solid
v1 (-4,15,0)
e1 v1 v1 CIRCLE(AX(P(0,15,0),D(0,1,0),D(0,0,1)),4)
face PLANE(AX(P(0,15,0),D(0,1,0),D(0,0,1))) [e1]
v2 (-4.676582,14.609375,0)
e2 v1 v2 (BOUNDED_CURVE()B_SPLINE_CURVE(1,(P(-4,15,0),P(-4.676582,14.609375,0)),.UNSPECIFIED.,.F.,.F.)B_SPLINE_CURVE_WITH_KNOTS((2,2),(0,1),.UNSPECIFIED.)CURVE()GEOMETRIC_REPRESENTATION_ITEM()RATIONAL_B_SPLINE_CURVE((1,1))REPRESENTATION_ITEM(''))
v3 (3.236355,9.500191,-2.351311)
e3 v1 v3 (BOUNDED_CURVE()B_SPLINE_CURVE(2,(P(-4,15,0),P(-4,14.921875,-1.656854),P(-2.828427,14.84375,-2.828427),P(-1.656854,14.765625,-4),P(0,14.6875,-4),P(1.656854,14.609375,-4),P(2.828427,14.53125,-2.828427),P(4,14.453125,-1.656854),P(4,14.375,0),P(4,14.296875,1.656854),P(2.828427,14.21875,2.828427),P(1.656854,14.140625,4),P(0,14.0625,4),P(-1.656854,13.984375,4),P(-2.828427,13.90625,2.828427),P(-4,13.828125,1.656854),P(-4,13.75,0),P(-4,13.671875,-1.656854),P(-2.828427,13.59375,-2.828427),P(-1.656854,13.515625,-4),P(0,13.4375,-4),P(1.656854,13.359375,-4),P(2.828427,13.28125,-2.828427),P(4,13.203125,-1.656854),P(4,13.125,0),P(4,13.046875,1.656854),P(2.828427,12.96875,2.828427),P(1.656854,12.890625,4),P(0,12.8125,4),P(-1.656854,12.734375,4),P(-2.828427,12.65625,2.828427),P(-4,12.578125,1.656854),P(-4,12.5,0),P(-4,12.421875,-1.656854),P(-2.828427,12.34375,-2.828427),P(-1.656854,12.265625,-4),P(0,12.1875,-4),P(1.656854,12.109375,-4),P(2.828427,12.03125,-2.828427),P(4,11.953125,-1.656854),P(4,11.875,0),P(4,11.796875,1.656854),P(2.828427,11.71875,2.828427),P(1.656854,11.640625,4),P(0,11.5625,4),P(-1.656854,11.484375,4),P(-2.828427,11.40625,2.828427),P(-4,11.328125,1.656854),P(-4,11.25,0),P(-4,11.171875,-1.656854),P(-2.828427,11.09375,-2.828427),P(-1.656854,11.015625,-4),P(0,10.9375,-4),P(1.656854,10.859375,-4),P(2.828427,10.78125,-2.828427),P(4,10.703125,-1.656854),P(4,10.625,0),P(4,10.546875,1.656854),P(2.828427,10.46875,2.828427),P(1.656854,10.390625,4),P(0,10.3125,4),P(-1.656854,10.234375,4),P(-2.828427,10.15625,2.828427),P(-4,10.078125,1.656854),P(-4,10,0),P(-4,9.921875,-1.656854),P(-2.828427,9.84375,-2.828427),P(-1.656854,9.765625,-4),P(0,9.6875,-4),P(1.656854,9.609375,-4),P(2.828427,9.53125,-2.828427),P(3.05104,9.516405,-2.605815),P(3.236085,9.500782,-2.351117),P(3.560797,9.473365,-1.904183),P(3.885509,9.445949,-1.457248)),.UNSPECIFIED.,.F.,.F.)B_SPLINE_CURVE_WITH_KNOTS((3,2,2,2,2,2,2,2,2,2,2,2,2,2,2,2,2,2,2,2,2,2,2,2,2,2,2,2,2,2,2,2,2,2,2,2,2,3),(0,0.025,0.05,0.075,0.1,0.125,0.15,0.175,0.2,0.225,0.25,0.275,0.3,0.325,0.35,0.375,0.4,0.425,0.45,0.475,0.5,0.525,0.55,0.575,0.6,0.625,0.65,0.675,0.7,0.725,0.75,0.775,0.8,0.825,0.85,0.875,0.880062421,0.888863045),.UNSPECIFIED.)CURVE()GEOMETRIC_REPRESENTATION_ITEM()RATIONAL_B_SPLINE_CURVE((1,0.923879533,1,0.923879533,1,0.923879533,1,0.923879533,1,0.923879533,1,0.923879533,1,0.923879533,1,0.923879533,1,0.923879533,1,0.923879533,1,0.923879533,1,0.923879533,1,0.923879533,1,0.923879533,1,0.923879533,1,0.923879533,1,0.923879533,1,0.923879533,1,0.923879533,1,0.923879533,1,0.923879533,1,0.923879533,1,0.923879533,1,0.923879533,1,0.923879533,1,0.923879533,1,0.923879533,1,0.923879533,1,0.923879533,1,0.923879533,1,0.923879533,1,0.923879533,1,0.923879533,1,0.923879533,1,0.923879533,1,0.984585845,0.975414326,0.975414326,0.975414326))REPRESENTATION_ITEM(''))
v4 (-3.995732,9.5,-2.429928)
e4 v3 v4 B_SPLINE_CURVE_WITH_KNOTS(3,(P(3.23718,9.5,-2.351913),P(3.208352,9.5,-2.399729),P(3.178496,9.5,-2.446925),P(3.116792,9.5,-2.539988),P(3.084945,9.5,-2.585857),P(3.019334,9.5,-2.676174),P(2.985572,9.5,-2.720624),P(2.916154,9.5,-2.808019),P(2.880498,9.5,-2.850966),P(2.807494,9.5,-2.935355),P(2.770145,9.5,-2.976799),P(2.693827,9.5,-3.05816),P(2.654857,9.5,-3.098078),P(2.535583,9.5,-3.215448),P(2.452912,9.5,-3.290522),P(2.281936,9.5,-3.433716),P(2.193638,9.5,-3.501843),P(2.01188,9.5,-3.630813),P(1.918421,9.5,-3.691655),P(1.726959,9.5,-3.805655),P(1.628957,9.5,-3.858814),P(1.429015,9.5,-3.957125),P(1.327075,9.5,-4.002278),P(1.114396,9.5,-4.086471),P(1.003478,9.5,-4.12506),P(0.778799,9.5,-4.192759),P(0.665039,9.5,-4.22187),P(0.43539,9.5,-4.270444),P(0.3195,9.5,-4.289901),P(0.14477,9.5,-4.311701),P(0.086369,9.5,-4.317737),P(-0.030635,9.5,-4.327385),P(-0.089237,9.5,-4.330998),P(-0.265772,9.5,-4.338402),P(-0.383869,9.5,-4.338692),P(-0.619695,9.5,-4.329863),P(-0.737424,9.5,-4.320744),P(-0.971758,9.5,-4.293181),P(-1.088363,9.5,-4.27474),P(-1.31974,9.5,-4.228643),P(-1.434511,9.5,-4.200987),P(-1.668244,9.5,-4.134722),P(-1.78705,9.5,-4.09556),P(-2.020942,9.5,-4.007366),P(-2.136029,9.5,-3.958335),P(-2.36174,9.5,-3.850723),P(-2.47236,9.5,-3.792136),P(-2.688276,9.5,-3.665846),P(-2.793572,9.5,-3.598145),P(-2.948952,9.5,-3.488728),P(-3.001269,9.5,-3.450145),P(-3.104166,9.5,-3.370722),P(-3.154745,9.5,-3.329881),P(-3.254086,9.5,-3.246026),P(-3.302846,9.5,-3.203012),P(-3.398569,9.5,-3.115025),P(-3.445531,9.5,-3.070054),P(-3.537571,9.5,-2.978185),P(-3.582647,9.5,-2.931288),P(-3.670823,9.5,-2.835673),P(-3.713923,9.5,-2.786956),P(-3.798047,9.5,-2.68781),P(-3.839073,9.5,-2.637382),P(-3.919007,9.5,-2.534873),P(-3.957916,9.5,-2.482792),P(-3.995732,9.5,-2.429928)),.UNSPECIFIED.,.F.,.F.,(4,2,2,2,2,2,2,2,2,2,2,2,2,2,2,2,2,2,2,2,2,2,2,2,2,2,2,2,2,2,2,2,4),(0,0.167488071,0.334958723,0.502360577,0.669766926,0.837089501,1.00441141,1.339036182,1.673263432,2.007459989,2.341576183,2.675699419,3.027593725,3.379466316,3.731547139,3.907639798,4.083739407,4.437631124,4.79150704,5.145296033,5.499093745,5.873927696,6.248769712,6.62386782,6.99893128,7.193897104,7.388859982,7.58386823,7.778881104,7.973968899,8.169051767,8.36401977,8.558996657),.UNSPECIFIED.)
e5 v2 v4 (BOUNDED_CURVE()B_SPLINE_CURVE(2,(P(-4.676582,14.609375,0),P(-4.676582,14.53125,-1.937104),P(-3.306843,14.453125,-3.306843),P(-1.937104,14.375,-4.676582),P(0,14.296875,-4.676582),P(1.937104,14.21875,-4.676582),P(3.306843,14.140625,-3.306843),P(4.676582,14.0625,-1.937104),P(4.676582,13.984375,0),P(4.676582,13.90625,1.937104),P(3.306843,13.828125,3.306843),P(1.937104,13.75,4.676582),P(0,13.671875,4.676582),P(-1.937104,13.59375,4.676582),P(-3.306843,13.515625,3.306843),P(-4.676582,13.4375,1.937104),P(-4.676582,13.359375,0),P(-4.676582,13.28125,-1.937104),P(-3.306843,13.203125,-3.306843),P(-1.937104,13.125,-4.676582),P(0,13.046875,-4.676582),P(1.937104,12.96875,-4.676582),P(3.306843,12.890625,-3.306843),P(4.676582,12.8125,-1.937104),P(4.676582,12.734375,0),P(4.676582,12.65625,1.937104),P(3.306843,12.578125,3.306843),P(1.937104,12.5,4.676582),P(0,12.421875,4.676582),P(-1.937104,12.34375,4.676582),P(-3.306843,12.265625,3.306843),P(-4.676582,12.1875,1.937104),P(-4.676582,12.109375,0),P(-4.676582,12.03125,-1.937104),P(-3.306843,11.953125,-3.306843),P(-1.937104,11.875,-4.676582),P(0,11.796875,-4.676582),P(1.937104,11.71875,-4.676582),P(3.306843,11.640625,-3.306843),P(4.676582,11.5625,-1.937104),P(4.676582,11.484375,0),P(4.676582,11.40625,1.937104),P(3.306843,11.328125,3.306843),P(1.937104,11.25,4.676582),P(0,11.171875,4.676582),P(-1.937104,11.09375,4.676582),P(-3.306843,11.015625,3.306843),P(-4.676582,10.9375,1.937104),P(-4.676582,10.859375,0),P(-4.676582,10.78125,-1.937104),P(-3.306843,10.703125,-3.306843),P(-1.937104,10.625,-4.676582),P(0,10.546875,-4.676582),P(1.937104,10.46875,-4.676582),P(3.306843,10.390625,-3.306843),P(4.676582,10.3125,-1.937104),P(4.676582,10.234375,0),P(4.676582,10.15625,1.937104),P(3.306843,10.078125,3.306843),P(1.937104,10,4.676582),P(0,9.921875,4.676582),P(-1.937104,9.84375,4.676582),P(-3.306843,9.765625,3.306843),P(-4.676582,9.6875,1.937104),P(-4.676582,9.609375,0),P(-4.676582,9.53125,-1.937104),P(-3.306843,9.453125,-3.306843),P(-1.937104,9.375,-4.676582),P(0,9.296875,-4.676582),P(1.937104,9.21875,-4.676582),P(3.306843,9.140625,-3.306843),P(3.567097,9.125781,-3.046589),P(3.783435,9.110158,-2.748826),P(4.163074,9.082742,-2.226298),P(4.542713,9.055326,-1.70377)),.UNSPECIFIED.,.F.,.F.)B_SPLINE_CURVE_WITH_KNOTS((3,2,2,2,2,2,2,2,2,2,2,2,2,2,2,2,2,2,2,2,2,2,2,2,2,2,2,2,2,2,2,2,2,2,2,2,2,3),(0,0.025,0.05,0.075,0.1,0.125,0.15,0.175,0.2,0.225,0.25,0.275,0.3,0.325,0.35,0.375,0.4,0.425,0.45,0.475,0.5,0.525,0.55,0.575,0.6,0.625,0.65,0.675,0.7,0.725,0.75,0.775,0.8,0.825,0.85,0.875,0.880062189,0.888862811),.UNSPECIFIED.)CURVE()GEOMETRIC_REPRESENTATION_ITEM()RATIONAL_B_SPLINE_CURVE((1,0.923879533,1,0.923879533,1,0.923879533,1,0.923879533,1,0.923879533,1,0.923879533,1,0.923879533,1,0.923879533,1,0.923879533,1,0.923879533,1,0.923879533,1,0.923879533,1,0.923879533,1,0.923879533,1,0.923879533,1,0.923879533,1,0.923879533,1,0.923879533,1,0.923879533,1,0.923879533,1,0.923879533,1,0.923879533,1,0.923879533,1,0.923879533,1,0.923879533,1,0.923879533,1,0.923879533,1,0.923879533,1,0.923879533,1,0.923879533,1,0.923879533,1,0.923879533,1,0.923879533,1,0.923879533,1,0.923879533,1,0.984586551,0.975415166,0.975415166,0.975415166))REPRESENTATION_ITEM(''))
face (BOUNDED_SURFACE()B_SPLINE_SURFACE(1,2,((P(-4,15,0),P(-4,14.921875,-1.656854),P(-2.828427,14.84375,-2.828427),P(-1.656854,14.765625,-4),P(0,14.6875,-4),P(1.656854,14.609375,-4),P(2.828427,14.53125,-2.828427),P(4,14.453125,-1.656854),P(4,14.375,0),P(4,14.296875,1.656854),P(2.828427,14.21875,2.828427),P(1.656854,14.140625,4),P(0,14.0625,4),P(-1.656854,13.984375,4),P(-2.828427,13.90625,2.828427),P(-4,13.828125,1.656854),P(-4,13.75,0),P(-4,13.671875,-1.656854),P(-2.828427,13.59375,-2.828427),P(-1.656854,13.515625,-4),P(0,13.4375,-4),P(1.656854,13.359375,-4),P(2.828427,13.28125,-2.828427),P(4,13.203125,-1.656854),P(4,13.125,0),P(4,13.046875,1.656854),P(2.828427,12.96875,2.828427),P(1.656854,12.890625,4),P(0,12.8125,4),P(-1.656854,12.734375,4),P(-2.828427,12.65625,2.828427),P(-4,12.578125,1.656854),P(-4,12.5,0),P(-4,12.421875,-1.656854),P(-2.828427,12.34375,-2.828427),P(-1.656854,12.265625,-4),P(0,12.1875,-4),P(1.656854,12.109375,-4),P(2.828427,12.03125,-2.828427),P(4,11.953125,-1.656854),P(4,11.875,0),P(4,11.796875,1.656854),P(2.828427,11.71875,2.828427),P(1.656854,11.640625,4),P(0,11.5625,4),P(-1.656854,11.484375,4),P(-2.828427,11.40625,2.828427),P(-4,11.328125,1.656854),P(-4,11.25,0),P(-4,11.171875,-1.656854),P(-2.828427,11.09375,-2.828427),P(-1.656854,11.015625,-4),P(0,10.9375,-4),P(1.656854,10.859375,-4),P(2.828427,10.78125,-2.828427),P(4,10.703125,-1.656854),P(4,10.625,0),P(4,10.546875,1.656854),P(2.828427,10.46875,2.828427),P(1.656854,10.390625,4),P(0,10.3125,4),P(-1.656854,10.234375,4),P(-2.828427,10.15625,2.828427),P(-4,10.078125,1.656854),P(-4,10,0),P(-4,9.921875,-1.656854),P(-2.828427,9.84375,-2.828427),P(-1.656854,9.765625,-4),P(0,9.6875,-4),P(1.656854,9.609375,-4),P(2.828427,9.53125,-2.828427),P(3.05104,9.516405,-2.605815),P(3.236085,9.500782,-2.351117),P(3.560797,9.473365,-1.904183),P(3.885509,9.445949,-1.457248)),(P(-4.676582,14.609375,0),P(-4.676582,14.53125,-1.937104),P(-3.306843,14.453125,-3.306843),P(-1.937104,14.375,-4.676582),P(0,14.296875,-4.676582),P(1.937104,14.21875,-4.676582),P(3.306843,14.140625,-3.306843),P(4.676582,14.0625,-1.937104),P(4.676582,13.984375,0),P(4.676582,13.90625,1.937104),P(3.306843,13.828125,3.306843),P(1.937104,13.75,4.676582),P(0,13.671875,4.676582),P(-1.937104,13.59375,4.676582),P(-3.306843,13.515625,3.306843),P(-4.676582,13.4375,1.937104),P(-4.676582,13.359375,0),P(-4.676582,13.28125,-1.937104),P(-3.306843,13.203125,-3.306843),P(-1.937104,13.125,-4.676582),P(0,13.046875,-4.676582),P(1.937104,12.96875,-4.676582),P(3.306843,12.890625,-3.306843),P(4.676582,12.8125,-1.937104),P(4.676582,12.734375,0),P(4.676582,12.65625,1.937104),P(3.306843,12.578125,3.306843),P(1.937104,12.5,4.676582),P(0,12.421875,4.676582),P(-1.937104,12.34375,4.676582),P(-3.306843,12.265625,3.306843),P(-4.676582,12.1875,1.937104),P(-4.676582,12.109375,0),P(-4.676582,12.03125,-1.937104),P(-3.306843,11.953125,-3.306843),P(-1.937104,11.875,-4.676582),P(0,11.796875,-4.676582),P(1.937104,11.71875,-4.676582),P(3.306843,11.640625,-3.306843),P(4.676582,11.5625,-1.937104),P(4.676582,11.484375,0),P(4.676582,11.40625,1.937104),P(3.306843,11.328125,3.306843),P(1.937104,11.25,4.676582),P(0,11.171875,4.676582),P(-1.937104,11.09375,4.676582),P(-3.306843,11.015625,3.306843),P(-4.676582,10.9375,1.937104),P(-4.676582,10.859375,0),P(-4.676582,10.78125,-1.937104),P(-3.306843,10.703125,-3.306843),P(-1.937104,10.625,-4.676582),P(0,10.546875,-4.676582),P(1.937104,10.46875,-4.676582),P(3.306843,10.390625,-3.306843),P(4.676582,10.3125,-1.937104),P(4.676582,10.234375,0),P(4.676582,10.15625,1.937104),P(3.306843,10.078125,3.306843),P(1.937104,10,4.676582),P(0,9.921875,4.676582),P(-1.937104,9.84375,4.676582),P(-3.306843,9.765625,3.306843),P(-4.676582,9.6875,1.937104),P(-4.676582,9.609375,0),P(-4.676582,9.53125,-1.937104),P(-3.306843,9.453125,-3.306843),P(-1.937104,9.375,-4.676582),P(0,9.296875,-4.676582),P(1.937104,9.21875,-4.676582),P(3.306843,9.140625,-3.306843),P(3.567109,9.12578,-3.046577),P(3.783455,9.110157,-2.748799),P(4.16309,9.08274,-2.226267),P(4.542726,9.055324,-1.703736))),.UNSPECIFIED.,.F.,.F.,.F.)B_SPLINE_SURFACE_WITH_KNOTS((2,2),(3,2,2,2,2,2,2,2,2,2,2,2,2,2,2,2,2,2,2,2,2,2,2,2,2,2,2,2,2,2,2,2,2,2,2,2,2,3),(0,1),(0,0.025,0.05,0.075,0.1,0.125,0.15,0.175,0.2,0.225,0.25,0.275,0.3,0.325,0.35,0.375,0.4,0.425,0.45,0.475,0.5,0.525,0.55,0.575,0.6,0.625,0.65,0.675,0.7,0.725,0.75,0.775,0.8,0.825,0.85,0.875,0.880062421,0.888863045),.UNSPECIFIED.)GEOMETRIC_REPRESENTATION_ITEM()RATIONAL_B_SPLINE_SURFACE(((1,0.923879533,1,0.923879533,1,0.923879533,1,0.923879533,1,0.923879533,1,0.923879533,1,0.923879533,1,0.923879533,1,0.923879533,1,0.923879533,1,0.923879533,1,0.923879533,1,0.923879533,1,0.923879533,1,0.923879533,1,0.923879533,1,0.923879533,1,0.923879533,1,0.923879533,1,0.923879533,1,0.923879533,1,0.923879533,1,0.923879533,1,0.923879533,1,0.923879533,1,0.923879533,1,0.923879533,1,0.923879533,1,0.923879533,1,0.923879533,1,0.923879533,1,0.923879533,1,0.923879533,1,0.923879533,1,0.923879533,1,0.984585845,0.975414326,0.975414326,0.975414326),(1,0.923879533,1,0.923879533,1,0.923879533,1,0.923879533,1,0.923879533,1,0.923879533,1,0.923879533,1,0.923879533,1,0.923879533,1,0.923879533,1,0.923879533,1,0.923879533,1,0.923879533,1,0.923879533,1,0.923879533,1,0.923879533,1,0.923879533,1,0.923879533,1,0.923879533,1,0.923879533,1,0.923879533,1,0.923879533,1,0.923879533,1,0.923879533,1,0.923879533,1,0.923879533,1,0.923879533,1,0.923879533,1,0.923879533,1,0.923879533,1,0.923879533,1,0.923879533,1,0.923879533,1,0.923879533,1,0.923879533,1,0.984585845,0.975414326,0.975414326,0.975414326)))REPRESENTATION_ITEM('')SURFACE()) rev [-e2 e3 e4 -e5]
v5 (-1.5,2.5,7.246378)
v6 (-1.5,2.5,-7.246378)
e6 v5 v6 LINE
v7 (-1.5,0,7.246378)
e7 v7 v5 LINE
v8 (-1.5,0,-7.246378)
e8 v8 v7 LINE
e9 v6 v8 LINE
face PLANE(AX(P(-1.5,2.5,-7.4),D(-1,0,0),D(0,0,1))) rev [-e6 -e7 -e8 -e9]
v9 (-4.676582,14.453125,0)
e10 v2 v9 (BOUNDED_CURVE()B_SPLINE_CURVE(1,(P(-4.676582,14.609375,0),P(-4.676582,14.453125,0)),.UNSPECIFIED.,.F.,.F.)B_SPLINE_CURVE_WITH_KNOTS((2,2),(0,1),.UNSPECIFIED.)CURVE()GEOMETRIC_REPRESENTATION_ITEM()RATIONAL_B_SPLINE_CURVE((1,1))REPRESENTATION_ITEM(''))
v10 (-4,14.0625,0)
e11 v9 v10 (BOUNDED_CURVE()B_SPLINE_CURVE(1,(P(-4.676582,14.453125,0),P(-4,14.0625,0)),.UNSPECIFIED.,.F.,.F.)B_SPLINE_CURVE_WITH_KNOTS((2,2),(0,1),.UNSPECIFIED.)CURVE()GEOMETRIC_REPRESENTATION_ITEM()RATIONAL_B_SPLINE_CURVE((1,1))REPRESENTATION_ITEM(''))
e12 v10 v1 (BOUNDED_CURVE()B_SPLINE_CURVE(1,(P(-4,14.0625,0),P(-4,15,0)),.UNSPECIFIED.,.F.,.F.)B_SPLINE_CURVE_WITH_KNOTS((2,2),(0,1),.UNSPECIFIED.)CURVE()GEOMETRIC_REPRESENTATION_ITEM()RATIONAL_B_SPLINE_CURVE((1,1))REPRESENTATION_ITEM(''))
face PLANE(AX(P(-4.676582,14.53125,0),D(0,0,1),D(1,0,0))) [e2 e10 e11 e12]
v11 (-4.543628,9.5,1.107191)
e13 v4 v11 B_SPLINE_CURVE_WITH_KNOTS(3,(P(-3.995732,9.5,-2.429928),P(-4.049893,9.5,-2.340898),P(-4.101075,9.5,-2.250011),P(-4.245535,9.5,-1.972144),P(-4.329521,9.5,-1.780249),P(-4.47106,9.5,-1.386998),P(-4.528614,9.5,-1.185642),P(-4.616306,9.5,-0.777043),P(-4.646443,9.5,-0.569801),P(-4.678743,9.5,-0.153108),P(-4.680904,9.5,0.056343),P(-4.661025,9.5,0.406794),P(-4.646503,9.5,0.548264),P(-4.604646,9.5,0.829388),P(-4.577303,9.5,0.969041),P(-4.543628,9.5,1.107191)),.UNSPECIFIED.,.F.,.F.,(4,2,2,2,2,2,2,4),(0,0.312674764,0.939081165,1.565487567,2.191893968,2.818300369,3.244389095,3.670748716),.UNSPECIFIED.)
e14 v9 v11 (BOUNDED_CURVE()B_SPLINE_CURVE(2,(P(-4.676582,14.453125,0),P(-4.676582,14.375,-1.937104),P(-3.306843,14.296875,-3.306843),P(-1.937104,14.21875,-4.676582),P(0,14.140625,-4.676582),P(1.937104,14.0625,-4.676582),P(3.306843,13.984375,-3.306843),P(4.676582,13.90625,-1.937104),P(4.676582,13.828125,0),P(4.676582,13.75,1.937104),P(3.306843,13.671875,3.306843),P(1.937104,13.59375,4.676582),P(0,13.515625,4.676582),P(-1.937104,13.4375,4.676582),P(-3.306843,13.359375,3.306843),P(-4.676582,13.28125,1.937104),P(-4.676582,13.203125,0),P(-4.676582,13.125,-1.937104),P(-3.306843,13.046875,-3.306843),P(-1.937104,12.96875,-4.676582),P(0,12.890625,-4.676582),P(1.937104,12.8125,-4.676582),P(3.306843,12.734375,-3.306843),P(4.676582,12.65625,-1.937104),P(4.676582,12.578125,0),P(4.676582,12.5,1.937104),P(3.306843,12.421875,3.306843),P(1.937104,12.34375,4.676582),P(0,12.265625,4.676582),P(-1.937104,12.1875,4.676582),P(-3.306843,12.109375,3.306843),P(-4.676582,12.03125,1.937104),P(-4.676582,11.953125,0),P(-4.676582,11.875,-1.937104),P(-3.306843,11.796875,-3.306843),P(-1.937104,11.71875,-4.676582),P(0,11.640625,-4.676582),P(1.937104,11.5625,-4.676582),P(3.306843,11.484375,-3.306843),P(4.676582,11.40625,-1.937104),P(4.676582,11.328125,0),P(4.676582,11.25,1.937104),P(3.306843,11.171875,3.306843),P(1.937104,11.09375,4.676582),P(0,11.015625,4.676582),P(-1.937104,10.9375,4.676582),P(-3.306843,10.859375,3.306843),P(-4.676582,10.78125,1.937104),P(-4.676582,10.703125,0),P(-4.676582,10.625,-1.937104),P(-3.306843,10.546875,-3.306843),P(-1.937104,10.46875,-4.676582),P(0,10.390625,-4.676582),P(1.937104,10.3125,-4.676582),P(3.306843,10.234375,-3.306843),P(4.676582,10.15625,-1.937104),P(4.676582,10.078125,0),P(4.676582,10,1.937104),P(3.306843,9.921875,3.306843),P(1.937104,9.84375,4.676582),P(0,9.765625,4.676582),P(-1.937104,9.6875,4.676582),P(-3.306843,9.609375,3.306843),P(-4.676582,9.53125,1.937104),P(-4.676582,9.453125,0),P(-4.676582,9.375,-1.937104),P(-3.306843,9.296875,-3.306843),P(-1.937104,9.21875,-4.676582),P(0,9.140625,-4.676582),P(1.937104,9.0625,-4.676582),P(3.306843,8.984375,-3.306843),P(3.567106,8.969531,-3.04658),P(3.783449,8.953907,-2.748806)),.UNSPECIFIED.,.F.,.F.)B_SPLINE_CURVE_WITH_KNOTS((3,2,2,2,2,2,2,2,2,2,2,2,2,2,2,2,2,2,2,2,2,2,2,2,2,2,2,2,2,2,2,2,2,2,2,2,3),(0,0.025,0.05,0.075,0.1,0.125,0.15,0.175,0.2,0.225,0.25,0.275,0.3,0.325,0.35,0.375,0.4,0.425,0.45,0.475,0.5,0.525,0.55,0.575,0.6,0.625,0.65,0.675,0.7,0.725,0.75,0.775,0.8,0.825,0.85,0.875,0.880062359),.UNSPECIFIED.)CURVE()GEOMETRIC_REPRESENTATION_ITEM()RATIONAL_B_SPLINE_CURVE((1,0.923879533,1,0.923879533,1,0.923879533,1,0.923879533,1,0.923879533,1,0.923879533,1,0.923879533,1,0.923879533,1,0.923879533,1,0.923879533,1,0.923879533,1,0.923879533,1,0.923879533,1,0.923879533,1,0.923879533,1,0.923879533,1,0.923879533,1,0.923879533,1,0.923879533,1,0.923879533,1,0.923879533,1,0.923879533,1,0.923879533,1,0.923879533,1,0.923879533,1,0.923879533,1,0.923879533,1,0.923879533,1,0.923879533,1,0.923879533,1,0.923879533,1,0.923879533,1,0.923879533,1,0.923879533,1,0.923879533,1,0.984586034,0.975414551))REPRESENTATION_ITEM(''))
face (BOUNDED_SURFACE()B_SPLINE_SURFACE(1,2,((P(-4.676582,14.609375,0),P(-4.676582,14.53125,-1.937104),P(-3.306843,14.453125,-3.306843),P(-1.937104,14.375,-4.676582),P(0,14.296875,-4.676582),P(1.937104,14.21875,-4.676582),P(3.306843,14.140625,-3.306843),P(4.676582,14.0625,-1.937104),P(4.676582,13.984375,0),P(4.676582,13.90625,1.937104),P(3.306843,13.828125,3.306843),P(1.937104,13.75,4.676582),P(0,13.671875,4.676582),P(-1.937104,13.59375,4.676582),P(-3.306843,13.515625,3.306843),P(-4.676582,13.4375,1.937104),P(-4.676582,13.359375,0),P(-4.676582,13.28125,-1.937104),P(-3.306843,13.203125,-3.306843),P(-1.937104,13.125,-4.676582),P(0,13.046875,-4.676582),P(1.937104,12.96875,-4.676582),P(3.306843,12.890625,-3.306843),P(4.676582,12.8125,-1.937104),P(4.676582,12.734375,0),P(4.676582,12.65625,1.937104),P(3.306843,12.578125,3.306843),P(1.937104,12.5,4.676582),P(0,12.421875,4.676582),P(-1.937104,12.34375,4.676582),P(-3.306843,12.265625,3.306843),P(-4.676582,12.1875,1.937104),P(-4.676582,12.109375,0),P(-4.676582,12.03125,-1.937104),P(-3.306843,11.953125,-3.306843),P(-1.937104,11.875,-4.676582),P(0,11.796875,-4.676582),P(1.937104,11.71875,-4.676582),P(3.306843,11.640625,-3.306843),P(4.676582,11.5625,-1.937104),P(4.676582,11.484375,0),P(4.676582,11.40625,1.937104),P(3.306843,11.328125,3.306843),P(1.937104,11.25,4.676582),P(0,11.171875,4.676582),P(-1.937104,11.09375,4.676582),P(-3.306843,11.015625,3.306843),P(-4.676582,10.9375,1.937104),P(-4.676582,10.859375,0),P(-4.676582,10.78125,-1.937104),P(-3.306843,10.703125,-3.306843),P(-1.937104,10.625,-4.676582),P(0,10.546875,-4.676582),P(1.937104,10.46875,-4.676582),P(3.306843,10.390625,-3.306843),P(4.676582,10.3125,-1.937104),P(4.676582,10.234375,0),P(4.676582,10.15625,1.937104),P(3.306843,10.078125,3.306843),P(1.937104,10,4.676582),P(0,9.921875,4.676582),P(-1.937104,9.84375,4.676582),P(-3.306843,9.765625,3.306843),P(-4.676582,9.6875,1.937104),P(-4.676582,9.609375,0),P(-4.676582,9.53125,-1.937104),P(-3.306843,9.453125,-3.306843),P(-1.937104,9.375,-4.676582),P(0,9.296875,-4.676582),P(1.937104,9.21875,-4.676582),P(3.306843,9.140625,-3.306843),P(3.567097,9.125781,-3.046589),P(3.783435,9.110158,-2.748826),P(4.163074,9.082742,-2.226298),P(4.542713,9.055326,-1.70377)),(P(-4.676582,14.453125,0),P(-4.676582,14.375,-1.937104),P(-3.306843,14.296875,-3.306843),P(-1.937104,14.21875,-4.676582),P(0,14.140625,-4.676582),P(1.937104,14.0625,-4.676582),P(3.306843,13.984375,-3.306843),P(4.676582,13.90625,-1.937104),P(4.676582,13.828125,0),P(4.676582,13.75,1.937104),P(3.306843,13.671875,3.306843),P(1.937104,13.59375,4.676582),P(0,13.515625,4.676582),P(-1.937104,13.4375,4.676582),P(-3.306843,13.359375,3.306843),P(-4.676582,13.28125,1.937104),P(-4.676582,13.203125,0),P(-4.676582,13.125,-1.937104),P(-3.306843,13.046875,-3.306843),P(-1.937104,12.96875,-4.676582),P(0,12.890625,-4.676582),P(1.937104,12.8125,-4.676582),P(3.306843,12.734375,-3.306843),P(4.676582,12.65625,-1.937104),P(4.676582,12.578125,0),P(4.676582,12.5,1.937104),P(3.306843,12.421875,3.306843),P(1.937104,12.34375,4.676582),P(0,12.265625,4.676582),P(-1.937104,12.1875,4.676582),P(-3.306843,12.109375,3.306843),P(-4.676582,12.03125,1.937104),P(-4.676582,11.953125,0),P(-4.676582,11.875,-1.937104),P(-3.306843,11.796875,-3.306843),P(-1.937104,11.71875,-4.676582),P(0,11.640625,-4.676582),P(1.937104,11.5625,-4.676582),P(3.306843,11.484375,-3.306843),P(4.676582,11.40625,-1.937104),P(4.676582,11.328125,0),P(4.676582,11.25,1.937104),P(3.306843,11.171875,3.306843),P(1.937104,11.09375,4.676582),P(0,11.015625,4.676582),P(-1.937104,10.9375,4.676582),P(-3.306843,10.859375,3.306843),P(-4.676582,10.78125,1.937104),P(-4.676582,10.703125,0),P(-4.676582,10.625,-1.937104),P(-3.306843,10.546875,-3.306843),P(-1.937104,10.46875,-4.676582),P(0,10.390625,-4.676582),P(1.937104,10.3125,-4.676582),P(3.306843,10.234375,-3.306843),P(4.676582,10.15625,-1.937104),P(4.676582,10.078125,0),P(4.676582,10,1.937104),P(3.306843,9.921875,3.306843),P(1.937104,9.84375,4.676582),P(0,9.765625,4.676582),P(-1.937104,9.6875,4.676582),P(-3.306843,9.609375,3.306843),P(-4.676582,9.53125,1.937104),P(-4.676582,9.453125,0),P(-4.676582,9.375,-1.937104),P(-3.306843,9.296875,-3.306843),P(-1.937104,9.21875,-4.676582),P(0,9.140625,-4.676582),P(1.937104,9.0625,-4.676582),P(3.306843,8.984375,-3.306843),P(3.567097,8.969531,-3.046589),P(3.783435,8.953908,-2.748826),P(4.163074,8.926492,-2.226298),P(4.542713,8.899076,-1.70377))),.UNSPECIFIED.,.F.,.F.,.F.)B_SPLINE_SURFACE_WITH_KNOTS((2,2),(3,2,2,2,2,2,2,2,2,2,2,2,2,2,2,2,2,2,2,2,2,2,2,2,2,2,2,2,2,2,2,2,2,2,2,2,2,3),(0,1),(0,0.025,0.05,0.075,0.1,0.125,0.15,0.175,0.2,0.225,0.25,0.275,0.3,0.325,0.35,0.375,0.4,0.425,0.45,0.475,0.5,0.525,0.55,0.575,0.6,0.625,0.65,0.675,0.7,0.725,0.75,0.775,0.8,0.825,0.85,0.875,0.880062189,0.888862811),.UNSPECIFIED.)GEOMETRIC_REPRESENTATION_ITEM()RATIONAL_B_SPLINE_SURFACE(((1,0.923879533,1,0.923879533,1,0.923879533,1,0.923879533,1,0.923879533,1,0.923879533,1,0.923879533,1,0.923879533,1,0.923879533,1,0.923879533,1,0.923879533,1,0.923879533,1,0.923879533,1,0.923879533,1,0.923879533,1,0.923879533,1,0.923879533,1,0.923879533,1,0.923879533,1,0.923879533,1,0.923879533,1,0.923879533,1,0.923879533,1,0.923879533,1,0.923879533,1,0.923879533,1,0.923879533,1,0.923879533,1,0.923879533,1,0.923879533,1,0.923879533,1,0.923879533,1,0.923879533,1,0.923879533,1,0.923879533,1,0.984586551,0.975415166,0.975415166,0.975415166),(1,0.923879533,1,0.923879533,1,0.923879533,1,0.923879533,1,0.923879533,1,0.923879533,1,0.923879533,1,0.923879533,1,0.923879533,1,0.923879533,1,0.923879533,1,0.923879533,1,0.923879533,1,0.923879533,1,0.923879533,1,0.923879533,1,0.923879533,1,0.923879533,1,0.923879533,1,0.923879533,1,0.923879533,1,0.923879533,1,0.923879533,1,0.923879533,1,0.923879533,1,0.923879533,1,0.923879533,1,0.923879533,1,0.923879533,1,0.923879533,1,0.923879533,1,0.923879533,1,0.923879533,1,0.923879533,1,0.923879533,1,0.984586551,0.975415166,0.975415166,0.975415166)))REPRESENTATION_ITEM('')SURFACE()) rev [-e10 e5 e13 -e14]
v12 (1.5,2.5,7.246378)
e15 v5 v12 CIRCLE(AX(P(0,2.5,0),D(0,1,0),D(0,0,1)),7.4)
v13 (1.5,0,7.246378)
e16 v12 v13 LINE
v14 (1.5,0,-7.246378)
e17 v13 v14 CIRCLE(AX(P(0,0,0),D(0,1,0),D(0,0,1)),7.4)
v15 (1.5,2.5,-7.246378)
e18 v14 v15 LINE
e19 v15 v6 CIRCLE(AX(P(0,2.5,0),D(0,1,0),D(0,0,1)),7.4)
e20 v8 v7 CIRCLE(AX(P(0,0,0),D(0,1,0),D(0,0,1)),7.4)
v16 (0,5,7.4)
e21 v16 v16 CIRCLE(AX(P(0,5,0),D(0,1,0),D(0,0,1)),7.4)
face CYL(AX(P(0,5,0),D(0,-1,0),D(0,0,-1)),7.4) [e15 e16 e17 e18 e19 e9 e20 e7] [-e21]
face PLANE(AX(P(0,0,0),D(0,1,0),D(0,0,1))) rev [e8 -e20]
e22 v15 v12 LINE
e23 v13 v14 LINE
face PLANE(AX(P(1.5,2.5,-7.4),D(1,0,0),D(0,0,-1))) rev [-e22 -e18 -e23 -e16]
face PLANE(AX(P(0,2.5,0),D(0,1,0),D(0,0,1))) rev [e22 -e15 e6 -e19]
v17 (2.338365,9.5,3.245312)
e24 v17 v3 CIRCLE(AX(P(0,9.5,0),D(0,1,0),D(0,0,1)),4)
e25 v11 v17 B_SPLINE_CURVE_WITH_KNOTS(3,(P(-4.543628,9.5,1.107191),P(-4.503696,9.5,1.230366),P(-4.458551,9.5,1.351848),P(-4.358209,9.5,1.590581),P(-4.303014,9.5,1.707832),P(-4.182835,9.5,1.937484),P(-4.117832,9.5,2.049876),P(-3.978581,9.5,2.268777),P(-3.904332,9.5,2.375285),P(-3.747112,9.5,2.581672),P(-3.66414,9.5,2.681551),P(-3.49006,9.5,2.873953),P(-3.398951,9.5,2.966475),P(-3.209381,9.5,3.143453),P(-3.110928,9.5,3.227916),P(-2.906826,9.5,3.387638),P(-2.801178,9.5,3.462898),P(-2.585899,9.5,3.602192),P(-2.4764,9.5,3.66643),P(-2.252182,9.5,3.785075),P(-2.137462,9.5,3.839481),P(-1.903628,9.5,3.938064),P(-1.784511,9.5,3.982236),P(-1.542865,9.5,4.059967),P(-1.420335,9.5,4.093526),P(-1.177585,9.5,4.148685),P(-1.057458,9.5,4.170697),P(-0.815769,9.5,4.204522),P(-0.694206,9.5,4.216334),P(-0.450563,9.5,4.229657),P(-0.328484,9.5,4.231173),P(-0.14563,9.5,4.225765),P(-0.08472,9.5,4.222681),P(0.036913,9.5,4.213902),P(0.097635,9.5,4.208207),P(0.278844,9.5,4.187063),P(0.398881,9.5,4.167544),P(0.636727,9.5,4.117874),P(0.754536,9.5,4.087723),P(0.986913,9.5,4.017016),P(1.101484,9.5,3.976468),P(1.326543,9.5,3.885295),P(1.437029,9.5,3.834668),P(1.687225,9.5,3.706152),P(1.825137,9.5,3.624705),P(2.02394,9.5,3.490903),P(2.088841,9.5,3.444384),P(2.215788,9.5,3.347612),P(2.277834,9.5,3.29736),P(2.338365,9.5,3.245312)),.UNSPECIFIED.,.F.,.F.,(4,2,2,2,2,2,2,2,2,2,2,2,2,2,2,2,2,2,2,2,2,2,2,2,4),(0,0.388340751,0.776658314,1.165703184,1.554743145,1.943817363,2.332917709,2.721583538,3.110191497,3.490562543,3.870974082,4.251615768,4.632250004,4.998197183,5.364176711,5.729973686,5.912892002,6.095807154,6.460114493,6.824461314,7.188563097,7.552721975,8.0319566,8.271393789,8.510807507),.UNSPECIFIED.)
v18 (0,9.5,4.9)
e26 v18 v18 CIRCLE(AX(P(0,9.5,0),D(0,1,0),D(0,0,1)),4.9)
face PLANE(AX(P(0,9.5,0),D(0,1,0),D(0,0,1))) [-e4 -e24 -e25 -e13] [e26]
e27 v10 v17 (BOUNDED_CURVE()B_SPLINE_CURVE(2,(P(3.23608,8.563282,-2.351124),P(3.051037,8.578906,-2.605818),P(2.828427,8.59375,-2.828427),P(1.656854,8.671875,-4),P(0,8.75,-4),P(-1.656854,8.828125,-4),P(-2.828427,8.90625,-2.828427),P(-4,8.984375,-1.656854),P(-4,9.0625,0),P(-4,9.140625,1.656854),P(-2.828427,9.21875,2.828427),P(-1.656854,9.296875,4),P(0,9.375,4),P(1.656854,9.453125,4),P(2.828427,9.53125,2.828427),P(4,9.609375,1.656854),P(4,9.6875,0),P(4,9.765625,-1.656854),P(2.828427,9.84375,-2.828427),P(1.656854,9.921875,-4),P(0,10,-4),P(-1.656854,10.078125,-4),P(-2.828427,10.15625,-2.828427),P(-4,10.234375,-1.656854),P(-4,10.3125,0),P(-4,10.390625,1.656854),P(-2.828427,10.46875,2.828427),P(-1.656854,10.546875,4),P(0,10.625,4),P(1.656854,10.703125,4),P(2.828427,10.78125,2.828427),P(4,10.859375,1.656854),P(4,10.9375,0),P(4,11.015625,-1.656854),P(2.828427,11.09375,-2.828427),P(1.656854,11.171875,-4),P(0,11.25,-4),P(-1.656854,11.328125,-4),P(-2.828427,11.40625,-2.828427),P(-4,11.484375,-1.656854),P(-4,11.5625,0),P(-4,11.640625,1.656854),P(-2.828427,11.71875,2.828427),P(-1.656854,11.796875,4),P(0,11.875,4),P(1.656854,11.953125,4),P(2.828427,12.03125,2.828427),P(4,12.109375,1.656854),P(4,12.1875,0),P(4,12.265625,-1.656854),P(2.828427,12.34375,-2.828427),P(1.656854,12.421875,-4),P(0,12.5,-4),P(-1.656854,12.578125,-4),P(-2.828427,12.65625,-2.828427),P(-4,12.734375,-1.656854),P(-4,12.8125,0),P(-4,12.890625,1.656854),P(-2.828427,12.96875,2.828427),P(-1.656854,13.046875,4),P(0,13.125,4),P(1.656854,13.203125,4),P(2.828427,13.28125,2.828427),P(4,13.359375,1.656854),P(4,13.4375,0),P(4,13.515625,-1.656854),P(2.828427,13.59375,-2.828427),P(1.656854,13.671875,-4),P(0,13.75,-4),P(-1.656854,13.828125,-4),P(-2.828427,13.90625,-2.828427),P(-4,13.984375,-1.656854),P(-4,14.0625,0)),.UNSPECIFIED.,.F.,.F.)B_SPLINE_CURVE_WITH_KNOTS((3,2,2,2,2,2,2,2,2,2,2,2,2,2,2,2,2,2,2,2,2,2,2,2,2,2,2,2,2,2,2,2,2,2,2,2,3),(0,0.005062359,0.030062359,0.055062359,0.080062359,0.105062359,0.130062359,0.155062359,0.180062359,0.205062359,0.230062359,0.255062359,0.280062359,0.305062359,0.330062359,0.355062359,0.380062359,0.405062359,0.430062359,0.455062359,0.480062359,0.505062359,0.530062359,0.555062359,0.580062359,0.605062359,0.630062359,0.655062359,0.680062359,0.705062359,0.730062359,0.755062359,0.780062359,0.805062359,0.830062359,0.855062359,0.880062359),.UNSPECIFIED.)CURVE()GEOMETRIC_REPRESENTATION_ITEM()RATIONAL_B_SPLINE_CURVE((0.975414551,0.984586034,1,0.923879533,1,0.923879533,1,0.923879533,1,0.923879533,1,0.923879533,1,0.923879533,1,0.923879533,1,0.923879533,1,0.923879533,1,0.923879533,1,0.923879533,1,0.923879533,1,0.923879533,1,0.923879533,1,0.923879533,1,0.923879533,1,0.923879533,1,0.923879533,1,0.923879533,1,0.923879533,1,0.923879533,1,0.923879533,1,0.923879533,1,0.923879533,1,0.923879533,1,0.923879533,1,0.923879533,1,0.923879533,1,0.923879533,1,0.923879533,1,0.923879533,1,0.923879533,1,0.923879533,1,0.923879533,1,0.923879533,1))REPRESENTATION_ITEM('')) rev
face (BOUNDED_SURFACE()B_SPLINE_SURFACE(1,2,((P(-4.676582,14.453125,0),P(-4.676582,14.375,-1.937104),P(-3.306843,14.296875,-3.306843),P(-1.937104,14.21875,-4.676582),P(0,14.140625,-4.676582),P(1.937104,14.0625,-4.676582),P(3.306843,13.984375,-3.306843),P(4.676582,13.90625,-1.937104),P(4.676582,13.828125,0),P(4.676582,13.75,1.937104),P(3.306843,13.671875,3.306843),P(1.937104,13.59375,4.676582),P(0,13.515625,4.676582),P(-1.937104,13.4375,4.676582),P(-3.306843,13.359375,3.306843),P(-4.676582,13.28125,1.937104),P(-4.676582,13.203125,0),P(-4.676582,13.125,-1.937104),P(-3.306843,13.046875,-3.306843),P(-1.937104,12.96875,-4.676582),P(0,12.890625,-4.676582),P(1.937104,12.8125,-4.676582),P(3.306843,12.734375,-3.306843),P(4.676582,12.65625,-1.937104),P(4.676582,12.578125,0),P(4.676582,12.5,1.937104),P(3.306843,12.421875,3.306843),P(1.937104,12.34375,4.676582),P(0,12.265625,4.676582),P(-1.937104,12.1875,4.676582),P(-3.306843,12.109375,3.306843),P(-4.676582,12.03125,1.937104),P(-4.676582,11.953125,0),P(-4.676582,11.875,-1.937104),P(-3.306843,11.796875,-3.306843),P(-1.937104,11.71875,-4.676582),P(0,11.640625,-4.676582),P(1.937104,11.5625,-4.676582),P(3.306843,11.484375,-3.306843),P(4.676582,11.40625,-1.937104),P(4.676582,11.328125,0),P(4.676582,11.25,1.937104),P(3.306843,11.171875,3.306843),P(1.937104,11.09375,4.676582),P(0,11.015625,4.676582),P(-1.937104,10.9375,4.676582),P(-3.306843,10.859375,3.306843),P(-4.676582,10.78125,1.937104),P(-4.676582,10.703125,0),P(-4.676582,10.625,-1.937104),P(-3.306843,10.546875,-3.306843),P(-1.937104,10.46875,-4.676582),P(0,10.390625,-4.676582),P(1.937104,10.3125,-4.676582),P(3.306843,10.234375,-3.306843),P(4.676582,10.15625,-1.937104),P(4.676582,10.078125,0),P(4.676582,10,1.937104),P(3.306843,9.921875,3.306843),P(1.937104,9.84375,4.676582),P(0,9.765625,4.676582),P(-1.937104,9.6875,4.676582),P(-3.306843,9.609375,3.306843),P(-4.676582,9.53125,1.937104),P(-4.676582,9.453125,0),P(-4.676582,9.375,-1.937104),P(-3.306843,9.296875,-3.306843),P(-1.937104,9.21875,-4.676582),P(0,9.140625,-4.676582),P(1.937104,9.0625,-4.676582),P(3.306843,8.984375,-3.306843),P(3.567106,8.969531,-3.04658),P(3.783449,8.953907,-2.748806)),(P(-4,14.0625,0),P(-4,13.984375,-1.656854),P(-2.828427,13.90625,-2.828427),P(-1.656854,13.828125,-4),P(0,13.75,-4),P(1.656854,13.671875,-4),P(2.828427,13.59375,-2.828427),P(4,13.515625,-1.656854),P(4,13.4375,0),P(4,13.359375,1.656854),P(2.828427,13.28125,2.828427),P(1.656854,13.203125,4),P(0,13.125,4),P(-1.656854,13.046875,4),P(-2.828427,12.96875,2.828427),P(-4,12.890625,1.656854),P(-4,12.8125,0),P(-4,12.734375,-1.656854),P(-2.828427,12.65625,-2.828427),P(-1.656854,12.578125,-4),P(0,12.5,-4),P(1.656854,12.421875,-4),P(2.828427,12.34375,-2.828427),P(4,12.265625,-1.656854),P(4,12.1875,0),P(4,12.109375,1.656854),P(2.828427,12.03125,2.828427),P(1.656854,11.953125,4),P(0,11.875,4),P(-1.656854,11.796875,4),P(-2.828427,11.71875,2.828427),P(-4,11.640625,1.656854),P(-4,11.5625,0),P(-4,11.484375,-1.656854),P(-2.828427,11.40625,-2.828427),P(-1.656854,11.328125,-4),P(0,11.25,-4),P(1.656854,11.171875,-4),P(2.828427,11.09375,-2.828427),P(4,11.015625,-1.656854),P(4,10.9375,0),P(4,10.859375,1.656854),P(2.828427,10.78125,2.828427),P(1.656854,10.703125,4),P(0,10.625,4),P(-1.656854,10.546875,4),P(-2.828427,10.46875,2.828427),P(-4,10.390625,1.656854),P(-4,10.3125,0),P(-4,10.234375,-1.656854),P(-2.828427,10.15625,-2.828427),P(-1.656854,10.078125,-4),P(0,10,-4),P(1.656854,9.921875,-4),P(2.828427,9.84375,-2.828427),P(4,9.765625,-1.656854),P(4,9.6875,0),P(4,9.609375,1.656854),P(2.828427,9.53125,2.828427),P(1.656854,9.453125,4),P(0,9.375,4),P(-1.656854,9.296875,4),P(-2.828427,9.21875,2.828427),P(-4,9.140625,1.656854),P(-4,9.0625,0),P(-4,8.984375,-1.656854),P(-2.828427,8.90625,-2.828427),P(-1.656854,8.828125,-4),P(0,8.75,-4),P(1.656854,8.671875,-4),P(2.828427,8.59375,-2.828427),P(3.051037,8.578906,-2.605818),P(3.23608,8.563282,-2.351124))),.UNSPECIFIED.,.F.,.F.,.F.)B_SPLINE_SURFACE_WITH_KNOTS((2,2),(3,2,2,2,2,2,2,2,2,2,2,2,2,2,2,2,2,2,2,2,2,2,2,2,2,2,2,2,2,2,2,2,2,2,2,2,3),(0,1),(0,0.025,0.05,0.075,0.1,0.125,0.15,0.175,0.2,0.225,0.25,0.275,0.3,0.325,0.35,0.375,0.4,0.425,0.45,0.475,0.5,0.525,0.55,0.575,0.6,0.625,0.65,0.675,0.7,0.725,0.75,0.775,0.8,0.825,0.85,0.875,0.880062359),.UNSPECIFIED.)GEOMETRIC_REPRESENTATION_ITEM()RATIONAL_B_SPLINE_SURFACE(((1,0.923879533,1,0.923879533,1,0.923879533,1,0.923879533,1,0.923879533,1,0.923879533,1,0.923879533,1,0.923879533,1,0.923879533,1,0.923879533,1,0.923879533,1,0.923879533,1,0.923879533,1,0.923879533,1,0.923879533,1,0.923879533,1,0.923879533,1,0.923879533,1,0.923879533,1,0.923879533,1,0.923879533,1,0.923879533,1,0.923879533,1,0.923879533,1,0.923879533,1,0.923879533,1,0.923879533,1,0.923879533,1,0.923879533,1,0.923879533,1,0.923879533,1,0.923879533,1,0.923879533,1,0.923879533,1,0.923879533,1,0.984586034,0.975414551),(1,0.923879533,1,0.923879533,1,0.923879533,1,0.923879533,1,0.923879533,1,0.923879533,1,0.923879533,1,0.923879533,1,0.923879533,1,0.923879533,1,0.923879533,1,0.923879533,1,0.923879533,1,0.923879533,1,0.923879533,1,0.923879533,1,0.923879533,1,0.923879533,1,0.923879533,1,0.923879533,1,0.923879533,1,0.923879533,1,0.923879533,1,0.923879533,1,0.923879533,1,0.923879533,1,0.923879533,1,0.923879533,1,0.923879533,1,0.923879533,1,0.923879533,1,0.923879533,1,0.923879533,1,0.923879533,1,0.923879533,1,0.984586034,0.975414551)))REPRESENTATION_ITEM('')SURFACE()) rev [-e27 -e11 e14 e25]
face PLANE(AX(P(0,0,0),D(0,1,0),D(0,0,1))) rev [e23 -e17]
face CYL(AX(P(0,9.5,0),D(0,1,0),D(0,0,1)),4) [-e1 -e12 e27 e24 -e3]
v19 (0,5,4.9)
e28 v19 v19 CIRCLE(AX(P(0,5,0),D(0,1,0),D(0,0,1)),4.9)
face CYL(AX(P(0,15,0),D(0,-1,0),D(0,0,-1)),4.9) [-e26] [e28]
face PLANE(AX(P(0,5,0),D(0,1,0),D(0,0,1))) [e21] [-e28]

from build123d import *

# Parameters (mm, degrees)
SKETCH1_R           = 7.4
BOSS_EXTRUDE1_DEPTH = 5
SKETCH2_R           = 4.9
BOSS_EXTRUDE2_DEPTH = 10
SKETCH13_OUTSIDE_W  = 21.95
SKETCH13_OUTSIDE_H  = 21.95
SKETCH13_OUTSIDE_R  = 4
CUT_EXTRUDE4_DEPTH  = 5.5
THREAD2_PITCH       = 1.25
SKETCH5_W           = 3
SKETCH5_H           = 14.8
CUT_EXTRUDE5_DEPTH  = 2.5


with BuildPart() as part:
    # Sketch1 → Boss-Extrude1 (new body)
    with BuildSketch(Plane(origin=(0, 0, 0), x_dir=(1, 0, 0), z_dir=(0, 1, 0))):
        with Locations(Location((0, 0, 0), (0, 0, 270))):
            Circle(SKETCH1_R)
    extrude(amount=BOSS_EXTRUDE1_DEPTH)

    # Sketch2 → Boss-Extrude2 (add)
    with BuildSketch(Plane(origin=(0, 5, 0), x_dir=(1, 0, 0), z_dir=(0, 1, 0))):
        with Locations(Location((0, 0, 0), (0, 0, 270))):
            Circle(SKETCH2_R)
    extrude(amount=BOSS_EXTRUDE2_DEPTH)

    # Sketch13 outside → Cut-Extrude4 (cut)
    with BuildSketch(Plane(origin=(0, 15, 0), x_dir=(1, 0, 0), z_dir=(0, 1, 0))):
        Rectangle(SKETCH13_OUTSIDE_W, SKETCH13_OUTSIDE_H)
        with Locations(Location((0, 0, 0), (0, 0, 270))):
            Circle(SKETCH13_OUTSIDE_R, mode=Mode.SUBTRACT)
    extrude(amount=-CUT_EXTRUDE4_DEPTH, mode=Mode.SUBTRACT)

    # Thread2: the profile of Thread Profile4 profile screwed along a right-hand helix of 4.4 turns, 8 arcs to a turn; built about Z, then put on its axis
    thread2_z = Axis((0, 0, 0), (0, 0, 1))
    thread2_corners = [(3.9997, 0, -0.000173205), (4.676582344, 0, 0.390624998), (4.676582344, 0, 0.546874998), (3.9997, 0, 0.937673202)]
    with BuildLine(mode=Mode.PRIVATE) as thread2_profile:
        Line(thread2_corners[0], thread2_corners[1])
        Line(thread2_corners[1], thread2_corners[2])
        Line(thread2_corners[2], thread2_corners[3])
        Line(thread2_corners[3], thread2_corners[0])
    thread2_cap = Face(thread2_profile.wire())
    thread2_turn_angles = [0, 22.5, 45, 67.5, 90, 112.5, 135, 157.5, 180, 202.5, 225, 247.5, 270, 292.5, 315, 337.5, 360]
    thread2_turn_weights = [1, 0.9238795325112867, 1, 0.9238795325112867, 1, 0.9238795325112867, 1, 0.9238795325112867, 1, 0.9238795325112867, 1, 0.9238795325112867, 1, 0.9238795325112867, 1, 0.9238795325112867, 1]
    thread2_turn_rails = [Edge.make_bspline([Vector(p[0], p[1], 0).rotate(thread2_z, thread2_turn_angles[k]) / thread2_turn_weights[k] + Vector(0, 0, p[2] + THREAD2_PITCH * thread2_turn_angles[k] / 360) for k in range(17)], [0, 0, 0, 1, 1, 2, 2, 3, 3, 4, 4, 5, 5, 6, 6, 7, 7, 8, 8, 8], 2, thread2_turn_weights) for p in thread2_corners]
    thread2_turn_sides = [Face.make_surface_from_curves(thread2_turn_rails[p[0]], thread2_turn_rails[p[1]]) for p in [(0, 1), (1, 2), (2, 3), (3, 0)]]
    thread2_last_angles = [1440, 1462.5, 1485, 1507.5, 1530, 1552.5, 1575, 1579.5, 1584]
    thread2_last_weights = [1, 0.9238795325112867, 1, 0.9238795325112867, 1, 0.9238795325112867, 1, 0.996917333733128, 1]
    thread2_last_rails = [Edge.make_bspline([Vector(p[0], p[1], 0).rotate(thread2_z, thread2_last_angles[k]) / thread2_last_weights[k] + Vector(0, 0, p[2] + THREAD2_PITCH * thread2_last_angles[k] / 360) for k in range(9)], [0, 0, 0, 1, 1, 2, 2, 3, 3, 4, 4, 4], 2, thread2_last_weights) for p in thread2_corners]
    thread2_last_sides = [Face.make_surface_from_curves(thread2_last_rails[p[0]], thread2_last_rails[p[1]]) for p in [(0, 1), (1, 2), (2, 3), (3, 0)]]
    thread2 = Plane(origin=(0, 15, 0), x_dir=(-1, 0, 0), z_dir=(0, -1, 0)) * Solid(Shell([*[p.moved(Location((0, 0, THREAD2_PITCH * i))) for i in range(4) for p in thread2_turn_sides], *thread2_last_sides, thread2_cap, thread2_cap.rotate(thread2_z, 1584).moved(Location((0, 0, THREAD2_PITCH * 1584 / 360)))]))
    add(thread2)

    # Sketch5 → Cut-Extrude5 (cut)
    with BuildSketch(Plane.XZ):
        Rectangle(SKETCH5_W, SKETCH5_H)
    extrude(amount=-CUT_EXTRUDE5_DEPTH, mode=Mode.SUBTRACT)


solid = part.part
